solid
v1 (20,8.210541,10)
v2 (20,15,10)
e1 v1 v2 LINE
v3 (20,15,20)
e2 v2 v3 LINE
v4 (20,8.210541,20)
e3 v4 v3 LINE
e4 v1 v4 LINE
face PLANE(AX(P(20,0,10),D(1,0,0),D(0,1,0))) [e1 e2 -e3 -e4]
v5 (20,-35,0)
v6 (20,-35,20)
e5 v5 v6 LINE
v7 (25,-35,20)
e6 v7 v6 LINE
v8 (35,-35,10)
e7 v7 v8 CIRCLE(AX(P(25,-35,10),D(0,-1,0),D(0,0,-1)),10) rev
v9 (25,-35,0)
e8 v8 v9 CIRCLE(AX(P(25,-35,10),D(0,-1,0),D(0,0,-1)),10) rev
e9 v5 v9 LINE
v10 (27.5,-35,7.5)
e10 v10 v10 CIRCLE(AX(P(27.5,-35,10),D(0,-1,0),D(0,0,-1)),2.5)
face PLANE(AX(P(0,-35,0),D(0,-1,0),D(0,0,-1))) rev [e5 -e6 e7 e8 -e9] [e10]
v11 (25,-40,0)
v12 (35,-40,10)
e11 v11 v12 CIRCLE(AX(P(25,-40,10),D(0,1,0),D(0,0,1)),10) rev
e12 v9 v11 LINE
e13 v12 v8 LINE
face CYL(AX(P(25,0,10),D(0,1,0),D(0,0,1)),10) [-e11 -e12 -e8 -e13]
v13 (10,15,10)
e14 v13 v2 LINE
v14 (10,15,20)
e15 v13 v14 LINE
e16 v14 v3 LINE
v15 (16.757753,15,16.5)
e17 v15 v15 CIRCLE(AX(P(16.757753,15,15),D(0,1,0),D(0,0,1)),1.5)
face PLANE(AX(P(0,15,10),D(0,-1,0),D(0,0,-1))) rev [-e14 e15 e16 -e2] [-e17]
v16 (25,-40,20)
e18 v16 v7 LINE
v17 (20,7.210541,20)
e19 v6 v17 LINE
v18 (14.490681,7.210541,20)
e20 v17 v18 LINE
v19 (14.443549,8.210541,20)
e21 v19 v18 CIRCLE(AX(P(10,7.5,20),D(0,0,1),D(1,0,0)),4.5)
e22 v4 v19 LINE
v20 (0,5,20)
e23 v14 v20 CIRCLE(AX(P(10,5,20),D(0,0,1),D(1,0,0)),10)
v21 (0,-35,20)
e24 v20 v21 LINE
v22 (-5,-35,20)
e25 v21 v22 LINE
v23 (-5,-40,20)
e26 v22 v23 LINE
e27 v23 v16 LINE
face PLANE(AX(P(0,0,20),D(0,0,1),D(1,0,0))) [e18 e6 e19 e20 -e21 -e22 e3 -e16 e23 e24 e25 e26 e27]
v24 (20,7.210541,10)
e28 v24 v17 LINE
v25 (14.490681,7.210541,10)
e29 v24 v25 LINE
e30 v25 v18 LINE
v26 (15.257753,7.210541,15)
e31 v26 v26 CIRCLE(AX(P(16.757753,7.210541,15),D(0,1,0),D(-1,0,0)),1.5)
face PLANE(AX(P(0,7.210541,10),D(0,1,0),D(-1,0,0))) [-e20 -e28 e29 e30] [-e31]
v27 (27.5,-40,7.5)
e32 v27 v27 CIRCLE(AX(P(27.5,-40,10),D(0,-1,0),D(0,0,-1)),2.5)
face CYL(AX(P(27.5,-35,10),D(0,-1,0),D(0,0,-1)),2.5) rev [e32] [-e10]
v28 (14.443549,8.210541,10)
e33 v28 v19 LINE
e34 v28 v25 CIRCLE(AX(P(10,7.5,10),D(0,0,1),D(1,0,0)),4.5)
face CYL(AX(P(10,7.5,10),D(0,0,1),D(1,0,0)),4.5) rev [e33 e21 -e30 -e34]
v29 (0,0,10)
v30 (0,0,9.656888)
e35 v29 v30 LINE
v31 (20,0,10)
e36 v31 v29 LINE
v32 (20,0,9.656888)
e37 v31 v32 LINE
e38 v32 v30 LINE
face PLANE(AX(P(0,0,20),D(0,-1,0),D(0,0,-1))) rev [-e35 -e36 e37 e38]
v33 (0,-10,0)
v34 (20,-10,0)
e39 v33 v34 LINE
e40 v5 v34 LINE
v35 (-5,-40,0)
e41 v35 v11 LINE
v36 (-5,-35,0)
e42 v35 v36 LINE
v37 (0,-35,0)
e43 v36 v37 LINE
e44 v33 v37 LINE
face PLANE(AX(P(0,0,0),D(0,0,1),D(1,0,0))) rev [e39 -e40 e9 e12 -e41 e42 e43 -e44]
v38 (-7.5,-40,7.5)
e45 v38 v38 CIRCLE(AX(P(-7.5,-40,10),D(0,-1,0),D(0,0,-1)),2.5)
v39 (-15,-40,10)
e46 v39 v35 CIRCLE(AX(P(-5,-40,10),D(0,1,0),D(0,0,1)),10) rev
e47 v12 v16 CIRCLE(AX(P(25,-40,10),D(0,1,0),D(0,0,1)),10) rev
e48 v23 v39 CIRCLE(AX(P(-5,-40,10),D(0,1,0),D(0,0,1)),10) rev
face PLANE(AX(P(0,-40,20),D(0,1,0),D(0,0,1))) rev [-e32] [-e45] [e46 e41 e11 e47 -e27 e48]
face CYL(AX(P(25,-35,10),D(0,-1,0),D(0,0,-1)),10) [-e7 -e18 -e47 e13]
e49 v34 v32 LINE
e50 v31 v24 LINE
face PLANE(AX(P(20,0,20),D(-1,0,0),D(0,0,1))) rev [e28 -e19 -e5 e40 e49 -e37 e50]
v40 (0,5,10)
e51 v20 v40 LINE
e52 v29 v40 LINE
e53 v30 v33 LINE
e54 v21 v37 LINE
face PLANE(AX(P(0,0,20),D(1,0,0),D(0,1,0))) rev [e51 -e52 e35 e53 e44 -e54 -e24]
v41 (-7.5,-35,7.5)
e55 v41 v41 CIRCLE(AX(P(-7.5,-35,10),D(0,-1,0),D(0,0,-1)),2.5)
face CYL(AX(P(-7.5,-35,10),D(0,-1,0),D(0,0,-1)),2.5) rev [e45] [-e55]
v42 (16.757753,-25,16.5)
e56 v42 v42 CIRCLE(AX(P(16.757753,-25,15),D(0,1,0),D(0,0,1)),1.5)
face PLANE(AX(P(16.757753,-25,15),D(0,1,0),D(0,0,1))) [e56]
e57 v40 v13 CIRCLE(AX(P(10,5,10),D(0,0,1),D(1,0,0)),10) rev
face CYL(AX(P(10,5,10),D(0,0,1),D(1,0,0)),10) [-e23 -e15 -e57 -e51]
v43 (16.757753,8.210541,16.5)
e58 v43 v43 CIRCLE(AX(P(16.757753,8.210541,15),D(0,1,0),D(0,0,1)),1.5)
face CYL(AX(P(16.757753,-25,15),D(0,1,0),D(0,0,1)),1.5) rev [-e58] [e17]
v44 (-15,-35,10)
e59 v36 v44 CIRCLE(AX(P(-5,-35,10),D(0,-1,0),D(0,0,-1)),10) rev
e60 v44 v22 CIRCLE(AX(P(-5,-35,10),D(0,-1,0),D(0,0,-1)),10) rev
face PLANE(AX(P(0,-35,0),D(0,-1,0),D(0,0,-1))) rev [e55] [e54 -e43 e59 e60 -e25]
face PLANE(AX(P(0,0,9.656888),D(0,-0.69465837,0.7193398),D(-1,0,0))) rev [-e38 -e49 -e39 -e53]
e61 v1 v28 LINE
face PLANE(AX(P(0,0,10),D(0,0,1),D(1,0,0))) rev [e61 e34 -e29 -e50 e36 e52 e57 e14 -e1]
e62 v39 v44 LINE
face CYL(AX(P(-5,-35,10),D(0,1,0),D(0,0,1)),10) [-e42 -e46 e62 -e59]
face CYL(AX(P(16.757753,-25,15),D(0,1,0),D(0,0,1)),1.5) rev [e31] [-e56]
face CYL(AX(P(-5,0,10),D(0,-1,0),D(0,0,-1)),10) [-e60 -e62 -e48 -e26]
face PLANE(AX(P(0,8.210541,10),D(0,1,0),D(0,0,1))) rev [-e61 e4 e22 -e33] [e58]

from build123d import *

# Parameters (mm, degrees)
ESQUISSE2_W             = 20
ESQUISSE2_H             = 40
BOSS_EXTRU_2_DEPTH      = 20
BOSS_EXTRU_3_DEPTH      = 10
ESQUISSE6_W             = 50
ESQUISSE6_H             = 20
ESQUISSE6_R             = 2.5
BOSS_EXTRU_4_DEPTH      = 5
ESQUISSE8_R             = 1.5
ENL_V_MAT_EXTRU_1_DEPTH = 40
CONG_2_R                = 10
CONG_3_R                = 10
CHANFREIN2_SIZE         = 10
CHANFREIN2_SIZE2        = 9.656887748


with BuildPart() as part:
    # Esquisse2 → Boss.-Extru.2 (new body)
    with BuildSketch(Plane.XY):
        with Locations((10, -20)):
            Rectangle(ESQUISSE2_W, ESQUISSE2_H)
    extrude(amount=BOSS_EXTRU_2_DEPTH)

    # Esquisse3 → Boss.-Extru.3 (add)
    with BuildSketch(Plane.XY.offset(20)):
        with BuildLine():
            Line((0, 15), (0, 0))
            Line((0, 0), (20, 0))
            Line((20, 0), (20, 7.210541204))
            Line((20, 7.210541204), (14.490680751, 7.210541204))
            ThreePointArc((14.490680751, 7.210541204), (5.50498976, 7.288144059), (14.443549392, 8.210541204))
            Line((14.443549392, 8.210541204), (20, 8.210541204))
            Line((20, 8.210541204), (20, 15))
            Line((20, 15), (0, 15))
        make_face()
    extrude(amount=-BOSS_EXTRU_3_DEPTH)

    # Esquisse6 → Boss.-Extru.4 (add)
    with BuildSketch(Plane.XZ.offset(40)):
        with Locations((10, 10)):
            Rectangle(ESQUISSE6_W, ESQUISSE6_H)
        with Locations(Location((-7.5, 10, 0), (0, 0, 270))):
            Circle(ESQUISSE6_R, mode=Mode.SUBTRACT)
        with Locations(Location((27.5, 10, 0), (0, 0, 270))):
            Circle(ESQUISSE6_R, mode=Mode.SUBTRACT)
    extrude(amount=-BOSS_EXTRU_4_DEPTH)

    # Esquisse8 → Enlèv. mat.-Extru.1 (cut)
    with BuildSketch(Plane(origin=(0, 15, 0), x_dir=(1, 0, 0), z_dir=(0, 1, 0))):
        with Locations(Location((16.757752744, -15, 0), (0, 0, 270))):
            Circle(ESQUISSE8_R)
    extrude(amount=-ENL_V_MAT_EXTRU_1_DEPTH, mode=Mode.SUBTRACT)

    # Congé2
    cong_2_edges = [part.edges().sort_by_distance(p)[0] for p in [
        (0, 15, 15),
    ]]
    fillet(cong_2_edges, radius=CONG_2_R)

    # Congé3
    cong_3_edges = [part.edges().sort_by_distance(p)[0] for p in [
        (-15, -37.5, 0),
        (-15, -37.5, 20),
        (35, -37.5, 20),
        (35, -37.5, 0),
    ]]
    fillet(cong_3_edges, radius=CONG_3_R - 0.0001)  # a hair under: the kernel refuses the full size

    # Chanfrein2
    chanfrein2_edges = [part.edges().sort_by_distance(p)[0] for p in [
        (10, 0, 0),
    ]]
    chanfrein2_side = [part.faces().sort_by_distance(p)[0] for p in [
        (10, -21.029431142, 0),
    ]]
    chamfer(chanfrein2_edges, length=CHANFREIN2_SIZE, length2=CHANFREIN2_SIZE2, reference=chanfrein2_side[0])


solid = part.part
